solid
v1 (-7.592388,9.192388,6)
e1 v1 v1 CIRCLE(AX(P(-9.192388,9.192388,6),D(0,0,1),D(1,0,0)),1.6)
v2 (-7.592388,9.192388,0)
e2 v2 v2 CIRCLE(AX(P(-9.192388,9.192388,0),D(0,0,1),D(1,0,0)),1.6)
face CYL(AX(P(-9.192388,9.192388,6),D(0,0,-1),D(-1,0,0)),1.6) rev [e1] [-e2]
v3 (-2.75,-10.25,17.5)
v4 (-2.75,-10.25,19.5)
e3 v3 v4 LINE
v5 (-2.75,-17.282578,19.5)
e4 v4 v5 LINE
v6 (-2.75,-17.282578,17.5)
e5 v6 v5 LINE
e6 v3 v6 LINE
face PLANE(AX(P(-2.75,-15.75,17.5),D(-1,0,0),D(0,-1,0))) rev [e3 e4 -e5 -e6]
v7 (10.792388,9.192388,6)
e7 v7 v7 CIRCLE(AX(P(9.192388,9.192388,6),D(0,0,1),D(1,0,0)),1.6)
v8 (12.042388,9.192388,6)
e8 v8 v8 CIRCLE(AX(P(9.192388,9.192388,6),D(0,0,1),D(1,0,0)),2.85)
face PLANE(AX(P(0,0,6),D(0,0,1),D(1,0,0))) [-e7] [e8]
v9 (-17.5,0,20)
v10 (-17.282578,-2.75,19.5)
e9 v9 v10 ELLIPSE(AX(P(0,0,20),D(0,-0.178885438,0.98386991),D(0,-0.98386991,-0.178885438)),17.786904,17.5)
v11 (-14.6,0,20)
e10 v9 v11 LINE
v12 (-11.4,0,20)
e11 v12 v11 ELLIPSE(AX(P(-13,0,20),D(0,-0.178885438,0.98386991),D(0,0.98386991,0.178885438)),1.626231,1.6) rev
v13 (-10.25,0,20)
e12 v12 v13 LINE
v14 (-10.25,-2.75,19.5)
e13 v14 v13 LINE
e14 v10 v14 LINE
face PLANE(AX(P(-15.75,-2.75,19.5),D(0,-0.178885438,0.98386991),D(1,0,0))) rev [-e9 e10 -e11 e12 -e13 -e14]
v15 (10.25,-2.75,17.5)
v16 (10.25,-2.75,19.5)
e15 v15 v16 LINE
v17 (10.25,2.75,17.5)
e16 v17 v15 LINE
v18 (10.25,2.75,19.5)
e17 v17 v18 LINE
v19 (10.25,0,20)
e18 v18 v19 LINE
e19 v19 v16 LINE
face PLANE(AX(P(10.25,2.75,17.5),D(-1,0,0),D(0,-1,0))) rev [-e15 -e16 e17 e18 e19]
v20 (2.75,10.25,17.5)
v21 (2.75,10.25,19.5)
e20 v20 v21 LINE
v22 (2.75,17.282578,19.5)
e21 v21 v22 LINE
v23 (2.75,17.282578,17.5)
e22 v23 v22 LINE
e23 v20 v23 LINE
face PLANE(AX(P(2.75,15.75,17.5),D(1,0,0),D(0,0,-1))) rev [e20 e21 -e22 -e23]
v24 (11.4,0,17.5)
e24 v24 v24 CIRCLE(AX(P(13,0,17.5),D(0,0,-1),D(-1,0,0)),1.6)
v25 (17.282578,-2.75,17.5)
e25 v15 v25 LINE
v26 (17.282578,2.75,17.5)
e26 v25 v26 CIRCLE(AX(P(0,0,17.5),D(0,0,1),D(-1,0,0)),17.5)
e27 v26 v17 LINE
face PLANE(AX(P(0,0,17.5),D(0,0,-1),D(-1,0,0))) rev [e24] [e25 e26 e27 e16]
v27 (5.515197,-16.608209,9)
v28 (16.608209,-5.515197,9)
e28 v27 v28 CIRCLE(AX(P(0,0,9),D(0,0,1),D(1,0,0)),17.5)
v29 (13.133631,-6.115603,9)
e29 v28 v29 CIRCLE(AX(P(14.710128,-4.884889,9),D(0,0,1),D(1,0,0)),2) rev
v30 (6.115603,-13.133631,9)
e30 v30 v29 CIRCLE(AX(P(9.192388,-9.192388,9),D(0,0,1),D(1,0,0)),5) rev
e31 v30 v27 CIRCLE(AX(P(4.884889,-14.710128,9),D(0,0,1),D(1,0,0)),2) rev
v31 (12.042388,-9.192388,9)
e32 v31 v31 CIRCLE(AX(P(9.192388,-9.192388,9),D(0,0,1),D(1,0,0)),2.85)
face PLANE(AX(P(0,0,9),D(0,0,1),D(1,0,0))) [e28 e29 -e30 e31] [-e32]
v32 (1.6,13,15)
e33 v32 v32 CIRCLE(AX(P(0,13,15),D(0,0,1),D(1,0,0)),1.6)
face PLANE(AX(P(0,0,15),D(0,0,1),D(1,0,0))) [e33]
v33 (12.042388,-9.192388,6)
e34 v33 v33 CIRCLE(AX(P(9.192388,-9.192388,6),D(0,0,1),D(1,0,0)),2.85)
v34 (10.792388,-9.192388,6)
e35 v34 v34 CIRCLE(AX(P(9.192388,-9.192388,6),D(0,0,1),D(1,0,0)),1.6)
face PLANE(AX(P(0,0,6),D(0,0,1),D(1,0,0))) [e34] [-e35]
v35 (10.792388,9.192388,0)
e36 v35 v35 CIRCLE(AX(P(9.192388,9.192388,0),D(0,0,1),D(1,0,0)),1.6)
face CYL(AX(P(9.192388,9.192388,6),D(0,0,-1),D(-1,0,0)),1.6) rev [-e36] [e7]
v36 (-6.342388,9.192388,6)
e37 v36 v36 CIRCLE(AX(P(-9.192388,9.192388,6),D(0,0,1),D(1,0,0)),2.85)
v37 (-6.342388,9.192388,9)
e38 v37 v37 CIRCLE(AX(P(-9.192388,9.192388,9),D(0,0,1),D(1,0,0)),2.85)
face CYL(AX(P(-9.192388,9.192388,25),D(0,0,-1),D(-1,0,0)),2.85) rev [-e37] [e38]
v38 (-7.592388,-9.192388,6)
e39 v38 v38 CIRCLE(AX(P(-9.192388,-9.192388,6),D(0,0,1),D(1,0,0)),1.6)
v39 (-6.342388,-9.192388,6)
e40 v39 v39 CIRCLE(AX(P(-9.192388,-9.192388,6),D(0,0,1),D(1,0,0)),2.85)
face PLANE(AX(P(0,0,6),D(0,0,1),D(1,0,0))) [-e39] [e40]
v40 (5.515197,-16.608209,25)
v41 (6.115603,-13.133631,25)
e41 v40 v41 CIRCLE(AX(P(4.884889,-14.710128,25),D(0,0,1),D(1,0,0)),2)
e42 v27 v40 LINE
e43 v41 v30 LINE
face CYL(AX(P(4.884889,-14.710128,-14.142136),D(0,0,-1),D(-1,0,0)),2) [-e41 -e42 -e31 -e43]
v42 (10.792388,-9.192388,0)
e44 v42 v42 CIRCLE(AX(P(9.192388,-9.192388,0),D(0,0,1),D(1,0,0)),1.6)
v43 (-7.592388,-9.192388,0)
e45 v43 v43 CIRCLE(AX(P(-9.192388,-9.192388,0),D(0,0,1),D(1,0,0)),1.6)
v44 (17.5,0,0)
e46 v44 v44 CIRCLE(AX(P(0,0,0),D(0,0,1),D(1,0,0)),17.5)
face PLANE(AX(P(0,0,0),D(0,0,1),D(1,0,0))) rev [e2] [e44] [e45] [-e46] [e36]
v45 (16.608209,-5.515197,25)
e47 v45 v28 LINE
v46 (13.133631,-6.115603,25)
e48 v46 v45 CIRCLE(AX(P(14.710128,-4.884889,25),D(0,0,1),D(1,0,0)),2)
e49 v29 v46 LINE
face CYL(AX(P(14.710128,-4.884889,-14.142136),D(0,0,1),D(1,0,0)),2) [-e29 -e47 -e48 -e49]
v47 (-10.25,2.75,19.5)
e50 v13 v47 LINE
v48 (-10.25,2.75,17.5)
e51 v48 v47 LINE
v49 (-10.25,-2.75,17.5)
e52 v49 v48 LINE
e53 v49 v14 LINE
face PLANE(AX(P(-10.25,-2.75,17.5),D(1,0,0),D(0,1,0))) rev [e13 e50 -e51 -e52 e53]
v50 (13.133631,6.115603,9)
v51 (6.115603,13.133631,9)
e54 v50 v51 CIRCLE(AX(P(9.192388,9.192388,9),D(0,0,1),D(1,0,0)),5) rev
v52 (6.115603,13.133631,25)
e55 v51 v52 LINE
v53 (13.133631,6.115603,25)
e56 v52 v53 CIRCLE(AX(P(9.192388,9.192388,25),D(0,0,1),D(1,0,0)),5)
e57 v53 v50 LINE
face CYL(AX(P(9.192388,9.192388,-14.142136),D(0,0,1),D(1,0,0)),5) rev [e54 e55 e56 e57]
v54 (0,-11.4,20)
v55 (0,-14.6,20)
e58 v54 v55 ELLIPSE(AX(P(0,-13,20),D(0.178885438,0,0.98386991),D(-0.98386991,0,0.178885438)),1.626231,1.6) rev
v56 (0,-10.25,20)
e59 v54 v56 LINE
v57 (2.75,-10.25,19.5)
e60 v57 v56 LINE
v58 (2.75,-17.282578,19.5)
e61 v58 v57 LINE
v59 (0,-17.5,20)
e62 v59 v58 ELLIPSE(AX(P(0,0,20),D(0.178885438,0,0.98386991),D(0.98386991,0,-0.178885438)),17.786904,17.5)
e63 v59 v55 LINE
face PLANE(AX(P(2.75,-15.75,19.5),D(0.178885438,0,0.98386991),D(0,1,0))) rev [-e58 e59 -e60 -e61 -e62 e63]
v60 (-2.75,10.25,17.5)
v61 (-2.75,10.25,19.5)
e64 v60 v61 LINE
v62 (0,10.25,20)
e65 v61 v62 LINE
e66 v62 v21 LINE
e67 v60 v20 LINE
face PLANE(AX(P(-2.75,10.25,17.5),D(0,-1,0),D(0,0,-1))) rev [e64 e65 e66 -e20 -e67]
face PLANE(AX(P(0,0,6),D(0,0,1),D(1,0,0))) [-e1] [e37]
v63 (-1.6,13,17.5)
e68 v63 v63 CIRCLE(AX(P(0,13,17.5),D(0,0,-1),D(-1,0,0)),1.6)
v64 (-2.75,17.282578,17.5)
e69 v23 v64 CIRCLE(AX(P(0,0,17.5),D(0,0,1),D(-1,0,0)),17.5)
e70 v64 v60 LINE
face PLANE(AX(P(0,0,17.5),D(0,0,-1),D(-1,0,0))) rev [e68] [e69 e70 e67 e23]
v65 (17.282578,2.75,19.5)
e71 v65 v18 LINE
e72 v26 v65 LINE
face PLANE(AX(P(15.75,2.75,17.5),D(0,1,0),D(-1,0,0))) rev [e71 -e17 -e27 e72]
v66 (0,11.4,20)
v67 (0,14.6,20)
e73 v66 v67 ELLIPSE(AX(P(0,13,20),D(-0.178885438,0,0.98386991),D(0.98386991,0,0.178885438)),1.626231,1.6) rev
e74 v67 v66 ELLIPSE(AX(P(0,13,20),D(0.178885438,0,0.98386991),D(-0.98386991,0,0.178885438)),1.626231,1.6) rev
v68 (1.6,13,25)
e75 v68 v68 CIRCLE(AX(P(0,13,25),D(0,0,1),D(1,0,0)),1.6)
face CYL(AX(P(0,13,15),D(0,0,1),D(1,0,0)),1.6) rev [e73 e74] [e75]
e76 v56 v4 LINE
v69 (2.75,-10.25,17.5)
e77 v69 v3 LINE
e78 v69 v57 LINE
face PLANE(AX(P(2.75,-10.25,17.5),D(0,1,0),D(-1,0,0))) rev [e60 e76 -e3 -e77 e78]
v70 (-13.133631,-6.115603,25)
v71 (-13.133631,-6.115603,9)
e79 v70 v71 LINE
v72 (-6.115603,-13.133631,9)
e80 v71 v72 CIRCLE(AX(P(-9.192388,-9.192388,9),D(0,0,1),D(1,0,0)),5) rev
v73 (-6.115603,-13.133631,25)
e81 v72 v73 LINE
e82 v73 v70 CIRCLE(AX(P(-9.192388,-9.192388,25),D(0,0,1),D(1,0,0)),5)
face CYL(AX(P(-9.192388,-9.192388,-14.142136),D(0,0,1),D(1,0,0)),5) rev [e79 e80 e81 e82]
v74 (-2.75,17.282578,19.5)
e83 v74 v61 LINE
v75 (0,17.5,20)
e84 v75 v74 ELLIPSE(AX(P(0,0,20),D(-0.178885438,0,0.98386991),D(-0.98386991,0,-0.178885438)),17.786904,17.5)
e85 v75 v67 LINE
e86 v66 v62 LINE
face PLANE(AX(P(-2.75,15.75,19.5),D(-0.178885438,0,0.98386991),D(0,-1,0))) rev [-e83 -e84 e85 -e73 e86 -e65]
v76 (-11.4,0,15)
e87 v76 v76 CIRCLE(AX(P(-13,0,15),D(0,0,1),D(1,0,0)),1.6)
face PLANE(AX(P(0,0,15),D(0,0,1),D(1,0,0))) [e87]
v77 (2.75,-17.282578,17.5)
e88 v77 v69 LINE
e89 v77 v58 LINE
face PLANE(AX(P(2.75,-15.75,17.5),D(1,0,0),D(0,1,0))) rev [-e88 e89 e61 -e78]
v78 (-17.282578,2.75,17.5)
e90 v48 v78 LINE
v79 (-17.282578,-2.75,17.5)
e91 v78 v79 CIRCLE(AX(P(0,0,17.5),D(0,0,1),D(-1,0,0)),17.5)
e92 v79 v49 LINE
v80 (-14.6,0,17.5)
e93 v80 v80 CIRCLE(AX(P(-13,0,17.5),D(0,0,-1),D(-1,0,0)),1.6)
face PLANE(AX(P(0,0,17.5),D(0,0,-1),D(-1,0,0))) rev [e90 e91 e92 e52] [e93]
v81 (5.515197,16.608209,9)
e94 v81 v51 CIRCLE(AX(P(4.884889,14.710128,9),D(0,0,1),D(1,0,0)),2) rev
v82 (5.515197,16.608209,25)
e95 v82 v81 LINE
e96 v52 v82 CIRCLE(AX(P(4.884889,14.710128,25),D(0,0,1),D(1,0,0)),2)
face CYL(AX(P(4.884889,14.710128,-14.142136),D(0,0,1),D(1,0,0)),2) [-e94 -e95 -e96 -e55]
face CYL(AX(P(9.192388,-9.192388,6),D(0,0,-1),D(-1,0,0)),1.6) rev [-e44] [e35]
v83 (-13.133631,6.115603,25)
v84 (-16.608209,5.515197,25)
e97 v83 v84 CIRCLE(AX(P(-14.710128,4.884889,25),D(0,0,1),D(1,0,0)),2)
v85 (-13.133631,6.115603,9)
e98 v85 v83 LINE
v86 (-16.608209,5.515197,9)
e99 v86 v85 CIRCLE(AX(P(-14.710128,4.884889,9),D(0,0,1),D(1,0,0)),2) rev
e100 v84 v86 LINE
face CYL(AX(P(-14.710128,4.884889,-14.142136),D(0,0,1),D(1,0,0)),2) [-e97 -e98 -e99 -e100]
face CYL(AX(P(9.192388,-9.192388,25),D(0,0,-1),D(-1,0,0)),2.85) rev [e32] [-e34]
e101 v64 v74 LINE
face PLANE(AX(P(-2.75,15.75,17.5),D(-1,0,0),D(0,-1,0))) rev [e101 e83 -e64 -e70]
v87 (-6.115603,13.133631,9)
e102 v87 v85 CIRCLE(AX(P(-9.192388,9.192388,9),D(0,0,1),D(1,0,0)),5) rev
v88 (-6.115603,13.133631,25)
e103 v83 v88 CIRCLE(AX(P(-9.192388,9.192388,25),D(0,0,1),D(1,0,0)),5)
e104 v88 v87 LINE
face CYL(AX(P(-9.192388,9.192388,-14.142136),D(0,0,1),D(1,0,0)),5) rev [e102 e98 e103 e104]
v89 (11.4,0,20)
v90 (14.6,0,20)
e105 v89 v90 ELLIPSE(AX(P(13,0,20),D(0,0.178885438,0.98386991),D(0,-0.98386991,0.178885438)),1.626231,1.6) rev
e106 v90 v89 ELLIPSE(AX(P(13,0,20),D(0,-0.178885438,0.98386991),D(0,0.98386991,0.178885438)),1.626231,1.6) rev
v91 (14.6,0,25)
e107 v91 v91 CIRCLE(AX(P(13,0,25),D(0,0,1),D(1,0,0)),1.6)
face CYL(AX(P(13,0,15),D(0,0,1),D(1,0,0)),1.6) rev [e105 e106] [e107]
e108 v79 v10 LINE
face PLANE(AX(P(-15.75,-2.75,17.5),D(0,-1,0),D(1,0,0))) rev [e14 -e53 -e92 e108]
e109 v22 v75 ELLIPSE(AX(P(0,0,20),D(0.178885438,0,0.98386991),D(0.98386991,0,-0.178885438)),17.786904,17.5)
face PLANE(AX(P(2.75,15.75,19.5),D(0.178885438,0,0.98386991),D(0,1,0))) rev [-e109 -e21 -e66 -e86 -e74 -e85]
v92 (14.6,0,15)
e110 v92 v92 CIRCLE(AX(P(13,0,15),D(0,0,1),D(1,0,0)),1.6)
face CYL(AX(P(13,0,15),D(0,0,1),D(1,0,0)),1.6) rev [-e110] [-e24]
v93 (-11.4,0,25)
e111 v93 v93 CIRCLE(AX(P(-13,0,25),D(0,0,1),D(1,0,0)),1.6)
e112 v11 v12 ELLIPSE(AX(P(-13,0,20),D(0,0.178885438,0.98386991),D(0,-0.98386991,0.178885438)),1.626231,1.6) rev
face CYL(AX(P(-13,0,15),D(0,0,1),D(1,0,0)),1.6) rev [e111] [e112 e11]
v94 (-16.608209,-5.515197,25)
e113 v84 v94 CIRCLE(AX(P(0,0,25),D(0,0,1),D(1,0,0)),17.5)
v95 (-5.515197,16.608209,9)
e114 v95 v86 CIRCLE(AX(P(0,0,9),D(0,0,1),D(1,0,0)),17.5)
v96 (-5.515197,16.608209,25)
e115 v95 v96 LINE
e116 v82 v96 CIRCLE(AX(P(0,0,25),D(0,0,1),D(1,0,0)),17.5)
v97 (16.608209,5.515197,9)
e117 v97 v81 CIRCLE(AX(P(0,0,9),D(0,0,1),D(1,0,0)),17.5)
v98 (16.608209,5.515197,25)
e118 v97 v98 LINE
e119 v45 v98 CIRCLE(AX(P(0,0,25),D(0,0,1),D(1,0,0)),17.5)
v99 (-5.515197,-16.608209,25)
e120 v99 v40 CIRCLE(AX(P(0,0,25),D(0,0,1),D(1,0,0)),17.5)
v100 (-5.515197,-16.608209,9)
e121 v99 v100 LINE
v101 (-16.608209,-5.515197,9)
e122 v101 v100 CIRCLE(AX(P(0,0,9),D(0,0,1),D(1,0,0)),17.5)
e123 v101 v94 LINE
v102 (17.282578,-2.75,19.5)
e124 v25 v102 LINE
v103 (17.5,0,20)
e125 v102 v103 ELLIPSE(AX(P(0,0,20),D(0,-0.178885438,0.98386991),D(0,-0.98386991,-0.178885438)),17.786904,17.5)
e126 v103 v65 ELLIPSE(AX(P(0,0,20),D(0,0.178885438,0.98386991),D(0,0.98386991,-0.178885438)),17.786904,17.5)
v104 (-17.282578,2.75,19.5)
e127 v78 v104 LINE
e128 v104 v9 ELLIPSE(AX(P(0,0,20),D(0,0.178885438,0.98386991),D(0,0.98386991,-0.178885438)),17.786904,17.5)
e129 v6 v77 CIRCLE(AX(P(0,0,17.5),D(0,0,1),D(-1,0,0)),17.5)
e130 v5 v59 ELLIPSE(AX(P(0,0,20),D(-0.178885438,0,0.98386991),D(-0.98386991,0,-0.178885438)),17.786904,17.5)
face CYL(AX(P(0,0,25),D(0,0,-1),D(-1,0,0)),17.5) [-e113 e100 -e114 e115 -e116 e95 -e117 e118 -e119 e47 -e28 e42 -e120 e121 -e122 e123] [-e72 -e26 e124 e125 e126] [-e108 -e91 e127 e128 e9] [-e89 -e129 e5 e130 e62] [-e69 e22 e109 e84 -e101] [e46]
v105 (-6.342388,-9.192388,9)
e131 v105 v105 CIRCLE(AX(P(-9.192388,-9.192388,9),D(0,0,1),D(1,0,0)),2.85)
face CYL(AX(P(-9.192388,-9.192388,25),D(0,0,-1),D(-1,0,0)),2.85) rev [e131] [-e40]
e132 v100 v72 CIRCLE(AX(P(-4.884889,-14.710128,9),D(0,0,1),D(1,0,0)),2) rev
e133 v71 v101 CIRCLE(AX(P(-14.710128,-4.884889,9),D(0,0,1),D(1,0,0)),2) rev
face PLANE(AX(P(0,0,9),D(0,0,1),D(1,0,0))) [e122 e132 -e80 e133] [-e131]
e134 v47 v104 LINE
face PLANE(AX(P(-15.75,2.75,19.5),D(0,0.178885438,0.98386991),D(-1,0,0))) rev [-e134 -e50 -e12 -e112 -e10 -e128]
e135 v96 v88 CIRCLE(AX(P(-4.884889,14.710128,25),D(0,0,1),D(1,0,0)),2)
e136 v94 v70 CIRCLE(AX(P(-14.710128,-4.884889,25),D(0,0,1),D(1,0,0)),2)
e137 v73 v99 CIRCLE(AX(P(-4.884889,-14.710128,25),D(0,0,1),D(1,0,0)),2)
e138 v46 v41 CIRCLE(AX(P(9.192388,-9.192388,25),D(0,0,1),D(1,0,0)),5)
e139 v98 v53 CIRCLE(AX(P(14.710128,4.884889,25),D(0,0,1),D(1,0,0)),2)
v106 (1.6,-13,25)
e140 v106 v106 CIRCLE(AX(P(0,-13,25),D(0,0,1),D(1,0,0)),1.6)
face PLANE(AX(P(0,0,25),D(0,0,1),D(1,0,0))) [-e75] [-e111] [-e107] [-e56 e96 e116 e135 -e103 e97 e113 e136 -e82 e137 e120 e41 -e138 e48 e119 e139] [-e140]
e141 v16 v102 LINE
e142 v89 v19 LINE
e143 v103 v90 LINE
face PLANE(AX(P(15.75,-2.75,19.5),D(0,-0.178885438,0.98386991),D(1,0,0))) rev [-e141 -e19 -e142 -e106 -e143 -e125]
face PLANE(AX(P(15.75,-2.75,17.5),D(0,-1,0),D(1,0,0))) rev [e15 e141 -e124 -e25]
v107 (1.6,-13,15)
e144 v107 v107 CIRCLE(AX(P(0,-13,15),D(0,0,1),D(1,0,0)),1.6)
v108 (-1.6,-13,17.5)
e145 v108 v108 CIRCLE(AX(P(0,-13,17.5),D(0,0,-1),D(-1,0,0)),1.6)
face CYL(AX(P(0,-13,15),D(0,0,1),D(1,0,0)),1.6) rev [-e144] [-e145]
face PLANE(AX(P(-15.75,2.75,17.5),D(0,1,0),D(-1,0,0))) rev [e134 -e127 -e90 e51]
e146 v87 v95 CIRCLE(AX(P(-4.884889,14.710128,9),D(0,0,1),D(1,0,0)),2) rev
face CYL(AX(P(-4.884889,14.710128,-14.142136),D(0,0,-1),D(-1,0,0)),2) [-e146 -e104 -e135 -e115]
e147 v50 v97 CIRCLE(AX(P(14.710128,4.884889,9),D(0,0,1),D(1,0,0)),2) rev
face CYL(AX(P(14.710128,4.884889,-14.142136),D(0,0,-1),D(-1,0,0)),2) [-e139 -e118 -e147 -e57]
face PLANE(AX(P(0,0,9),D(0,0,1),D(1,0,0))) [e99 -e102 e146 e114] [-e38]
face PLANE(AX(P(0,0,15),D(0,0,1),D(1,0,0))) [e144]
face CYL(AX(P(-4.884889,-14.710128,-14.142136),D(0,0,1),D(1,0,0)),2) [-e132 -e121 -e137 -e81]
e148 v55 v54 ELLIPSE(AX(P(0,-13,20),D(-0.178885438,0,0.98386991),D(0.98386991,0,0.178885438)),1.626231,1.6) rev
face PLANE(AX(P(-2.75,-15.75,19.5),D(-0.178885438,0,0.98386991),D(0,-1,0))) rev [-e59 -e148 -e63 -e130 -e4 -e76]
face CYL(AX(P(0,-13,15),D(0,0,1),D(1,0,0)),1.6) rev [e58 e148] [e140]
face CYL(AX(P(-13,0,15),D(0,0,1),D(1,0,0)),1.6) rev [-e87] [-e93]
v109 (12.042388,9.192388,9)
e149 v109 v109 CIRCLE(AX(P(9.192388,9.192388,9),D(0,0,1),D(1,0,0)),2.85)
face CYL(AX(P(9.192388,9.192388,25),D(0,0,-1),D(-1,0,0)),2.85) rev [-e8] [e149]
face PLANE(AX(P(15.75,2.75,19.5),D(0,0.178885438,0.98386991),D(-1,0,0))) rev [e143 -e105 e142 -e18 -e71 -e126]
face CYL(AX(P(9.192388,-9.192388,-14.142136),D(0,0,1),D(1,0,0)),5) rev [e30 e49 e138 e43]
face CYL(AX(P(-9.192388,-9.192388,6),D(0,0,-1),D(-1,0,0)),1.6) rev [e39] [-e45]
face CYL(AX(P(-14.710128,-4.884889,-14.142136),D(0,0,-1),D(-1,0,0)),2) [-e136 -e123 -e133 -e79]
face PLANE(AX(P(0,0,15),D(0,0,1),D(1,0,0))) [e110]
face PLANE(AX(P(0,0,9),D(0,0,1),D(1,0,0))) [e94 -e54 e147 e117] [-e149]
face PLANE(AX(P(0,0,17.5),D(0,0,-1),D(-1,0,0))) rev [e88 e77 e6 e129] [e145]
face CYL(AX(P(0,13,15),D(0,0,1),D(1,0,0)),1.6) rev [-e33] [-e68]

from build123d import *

# Parameters (mm, degrees)
SKETCH1_R           = 17.5
SKETCH1_R_2         = 2.85
BOSS_EXTRUDE1_DEPTH = 25
SKETCH1_3_R         = 2.85
SKETCH1_3_R_2       = 1.6
BOSS_EXTRUDE2_DEPTH = 6
SKETCH2_R           = 5
CUT_EXTRUDE1_DEPTH  = 16
FILLET1_R           = 2
CUT_EXTRUDE2_START  = -7.5
SKETCH3_R           = 1.6
CUT_EXTRUDE2_DEPTH  = 2.5
CUT_EXTRUDE3_START  = -10
SKETCH3_2_R         = 1.6
CUT_EXTRUDE3_DEPTH  = 10
CHAMFER1_SIZE       = 2.75
CHAMFER1_SIZE_2     = 0.5


with BuildPart() as part:
    # Sketch1 → Boss-Extrude1 (new body)
    with BuildSketch(Plane(origin=(0, 0, 0), x_dir=(0, 1, 0), z_dir=(0, 0, 1))):
        with Locations(Location((0, 0, 0), (0, 0, 270))):
            Circle(SKETCH1_R)
        with Locations(Location((-9.192388155, 9.192388155, 0), (0, 0, 270))):
            Circle(SKETCH1_R_2, mode=Mode.SUBTRACT)
        with Locations(Location((-9.192388155, -9.192388155, 0), (0, 0, 270))):
            Circle(SKETCH1_R_2, mode=Mode.SUBTRACT)
        with Locations(Location((9.192388155, -9.192388155, 0), (0, 0, 270))):
            Circle(SKETCH1_R_2, mode=Mode.SUBTRACT)
        with Locations(Location((9.192388155, 9.192388155, 0), (0, 0, 270))):
            Circle(SKETCH1_R_2, mode=Mode.SUBTRACT)
    extrude(amount=BOSS_EXTRUDE1_DEPTH)

    # Sketch1<3> → Boss-Extrude2 (add)
    # profile 1 of 4: a face of its own
    with BuildSketch(Plane(origin=(0, 0, 0), x_dir=(0, 1, 0), z_dir=(0, 0, 1))):
        with Locations(Location((-9.192388155, -9.192388155, 0), (0, 0, 270))):
            Circle(SKETCH1_3_R)
        with Locations(Location((-9.192388155, -9.192388155, 0), (0, 0, 270))):
            Circle(SKETCH1_3_R_2, mode=Mode.SUBTRACT)
    # profile 2 of 4: a face of its own
    with BuildSketch(Plane(origin=(0, 0, 0), x_dir=(0, 1, 0), z_dir=(0, 0, 1))):
        with Locations(Location((-9.192388155, 9.192388155, 0), (0, 0, 270))):
            Circle(SKETCH1_3_R)
        with Locations(Location((-9.192388155, 9.192388155, 0), (0, 0, 270))):
            Circle(SKETCH1_3_R_2, mode=Mode.SUBTRACT)
    # profile 3 of 4: a face of its own
    with BuildSketch(Plane(origin=(0, 0, 0), x_dir=(0, 1, 0), z_dir=(0, 0, 1))):
        with Locations(Location((9.192388155, -9.192388155, 0), (0, 0, 270))):
            Circle(SKETCH1_3_R)
        with Locations(Location((9.192388155, -9.192388155, 0), (0, 0, 270))):
            Circle(SKETCH1_3_R_2, mode=Mode.SUBTRACT)
    # profile 4 of 4: a face of its own
    with BuildSketch(Plane(origin=(0, 0, 0), x_dir=(0, 1, 0), z_dir=(0, 0, 1))):
        with Locations(Location((9.192388155, 9.192388155, 0), (0, 0, 270))):
            Circle(SKETCH1_3_R)
        with Locations(Location((9.192388155, 9.192388155, 0), (0, 0, 270))):
            Circle(SKETCH1_3_R_2, mode=Mode.SUBTRACT)
    extrude(amount=BOSS_EXTRUDE2_DEPTH)

    # Sketch2 → Cut-Extrude1 (cut)
    with BuildSketch(Plane.XY.offset(25)):
        with Locations((-9.192388155, 9.192388155)):
            Circle(SKETCH2_R)
        with Locations((9.192388155, 9.192388155)):
            Circle(SKETCH2_R)
        with Locations((9.192388155, -9.192388155)):
            Circle(SKETCH2_R)
        with Locations((-9.192388155, -9.192388155)):
            Circle(SKETCH2_R)
    extrude(amount=-CUT_EXTRUDE1_DEPTH, mode=Mode.SUBTRACT)

    # Fillet1
    fillet1_edges = [part.edges().sort_by_distance(p)[0] for p in [
        (-14.028560913, -10.46181049, 17),
        (-10.46181049, -14.028560913, 17),
        (10.46181049, -14.028560913, 17),
        (14.028560913, -10.46181049, 17),
        (14.028560913, 10.46181049, 17),
        (10.46181049, 14.028560913, 17),
        (-10.46181049, 14.028560913, 17),
        (-14.028560913, 10.46181049, 17),
    ]]
    fillet(fillet1_edges, radius=FILLET1_R)

    # Sketch3 → Cut-Extrude2 (cut)
    # profile 1 of 4: a face of its own
    with BuildSketch(Plane.XY.offset(25).offset(CUT_EXTRUDE2_START)):
        with BuildLine():
            Line((-2.75, 15.75), (-2.75, 17.282577933))
            ThreePointArc((-2.75, 17.282577933), (0, 17.5), (2.75, 17.282577933))
            Line((2.75, 17.282577933), (2.75, 15.75))
            Line((2.75, 15.75), (2.75, 10.25))
            Line((2.75, 10.25), (-2.75, 10.25))
            Line((-2.75, 10.25), (-2.75, 15.75))
        make_face()
        with Locations((0, 13)):
            Circle(SKETCH3_R, mode=Mode.SUBTRACT)
    # profile 2 of 4: a face of its own
    with BuildSketch(Plane.XY.offset(25).offset(CUT_EXTRUDE2_START)):
        with BuildLine():
            Line((15.75, -2.75), (10.25, -2.75))
            Line((10.25, -2.75), (10.25, 2.75))
            Line((10.25, 2.75), (15.75, 2.75))
            Line((15.75, 2.75), (17.282577933, 2.75))
            ThreePointArc((17.282577933, 2.75), (17.5, 0), (17.282577933, -2.75))
            Line((17.282577933, -2.75), (15.75, -2.75))
        make_face()
        with Locations((13, 0)):
            Circle(SKETCH3_R, mode=Mode.SUBTRACT)
    # profile 3 of 4: a face of its own
    with BuildSketch(Plane.XY.offset(25).offset(CUT_EXTRUDE2_START)):
        with BuildLine():
            Line((-2.75, -15.75), (-2.75, -10.25))
            Line((-2.75, -10.25), (2.75, -10.25))
            Line((2.75, -10.25), (2.75, -15.75))
            Line((2.75, -15.75), (2.75, -17.282577933))
            ThreePointArc((2.75, -17.282577933), (0, -17.5), (-2.75, -17.282577933))
            Line((-2.75, -17.282577933), (-2.75, -15.75))
        make_face()
        with Locations((0, -13)):
            Circle(SKETCH3_R, mode=Mode.SUBTRACT)
    # profile 4 of 4: a face of its own
    with BuildSketch(Plane.XY.offset(25).offset(CUT_EXTRUDE2_START)):
        with BuildLine():
            Line((-15.75, 2.75), (-10.25, 2.75))
            Line((-10.25, 2.75), (-10.25, -2.75))
            Line((-10.25, -2.75), (-15.75, -2.75))
            Line((-15.75, -2.75), (-17.282577933, -2.75))
            ThreePointArc((-17.282577933, -2.75), (-17.5, 0), (-17.282577933, 2.75))
            Line((-17.282577933, 2.75), (-15.75, 2.75))
        make_face()
        with Locations((-13, 0)):
            Circle(SKETCH3_R, mode=Mode.SUBTRACT)
    extrude(amount=CUT_EXTRUDE2_DEPTH, mode=Mode.SUBTRACT)

    # Sketch3<2> → Cut-Extrude3 (cut)
    with BuildSketch(Plane.XY.offset(25).offset(CUT_EXTRUDE3_START)):
        with Locations((-13, 0)):
            Circle(SKETCH3_2_R)
        with Locations((0, 13)):
            Circle(SKETCH3_2_R)
        with Locations((13, 0)):
            Circle(SKETCH3_2_R)
        with Locations((0, -13)):
            Circle(SKETCH3_2_R)
    extrude(amount=CUT_EXTRUDE3_DEPTH, mode=Mode.SUBTRACT)

    # Chamfer1
    # the kernel refuses this chamfer: 2.75, 0.5 mm, written as the material it adds along each edge
    with BuildSketch(Plane(origin=(-3.104266441, -2.75, 20), x_dir=(1.0355932807417332e-14, 0.9999763028084744, 0.006884317068104265), z_dir=(-1, 0, 0))) as chamfer1_piece_1_section:
        Polygon((CHAMFER1_SIZE * 0.999976302808, CHAMFER1_SIZE * 0.0068843170681), (-CHAMFER1_SIZE_2 * 0.0068843170681, CHAMFER1_SIZE_2 * 0.999976302808), (0, 0), align=None)
    chamfer1_piece_1 = extrude(amount=21.324045051, mode=Mode.PRIVATE)
    chamfer1_piece_1 = chamfer1_piece_1 & Plane(origin=(0, 0, 19.863927103), x_dir=(1, 0, 0), z_dir=(0, 0, -1)) * Cylinder(17.5, 54, mode=Mode.PRIVATE)
    chamfer1_piece_1 = chamfer1_piece_1 - Plane(origin=(-13, 0, 19.863927103), x_dir=(1, 0, 0), z_dir=(0, 0, -1)) * Cylinder(1.6, 54, mode=Mode.PRIVATE)
    add(chamfer1_piece_1)
    with BuildSketch(Plane(origin=(-24.428311492, 2.75, 20), x_dir=(2.1371797081769355e-15, 0.20388124945923355, -0.9789956262001082), z_dir=(1, 0, 0))) as chamfer1_piece_2_section:
        Polygon((CHAMFER1_SIZE_2 * 0.9789956262, -CHAMFER1_SIZE_2 * 0.203881249459), (-CHAMFER1_SIZE * 0.203881249459, -CHAMFER1_SIZE * 0.9789956262), (0, 0), align=None)
    chamfer1_piece_2 = extrude(amount=21.324045051, mode=Mode.PRIVATE)
    chamfer1_piece_2 = chamfer1_piece_2 & Plane(origin=(0, 0, 19.852070676), x_dir=(1, 0, 0), z_dir=(0, 0, -1)) * Cylinder(17.5, 54, mode=Mode.PRIVATE)
    chamfer1_piece_2 = chamfer1_piece_2 - Plane(origin=(-13, 0, 19.852070676), x_dir=(1, 0, 0), z_dir=(0, 0, -1)) * Cylinder(1.6, 54, mode=Mode.PRIVATE)
    add(chamfer1_piece_2)
    with BuildSketch(Plane(origin=(-2.75, 3.104266441, 20), x_dir=(0.9999763028084744, 0, 0.006884317068104265), z_dir=(0, 1, 0))) as chamfer1_piece_3_section:
        Polygon((CHAMFER1_SIZE * 0.999976302808, CHAMFER1_SIZE * 0.0068843170681), (-CHAMFER1_SIZE_2 * 0.0068843170681, CHAMFER1_SIZE_2 * 0.999976302808), (0, 0), align=None)
    chamfer1_piece_3 = extrude(amount=21.324045051, mode=Mode.PRIVATE)
    chamfer1_piece_3 = chamfer1_piece_3 & Plane(origin=(0, 0, 19.863927103), x_dir=(1, 0, 0), z_dir=(0, 0, -1)) * Cylinder(17.5, 54, mode=Mode.PRIVATE)
    chamfer1_piece_3 = chamfer1_piece_3 - Plane(origin=(0, 13, 19.863927103), x_dir=(1, 0, 0), z_dir=(0, 0, -1)) * Cylinder(1.6, 54, mode=Mode.PRIVATE)
    add(chamfer1_piece_3)
    with BuildSketch(Plane(origin=(2.75, 24.428311492, 20), x_dir=(0.20388124945923355, 0, -0.9789956262001082), z_dir=(0, -1, 0))) as chamfer1_piece_4_section:
        Polygon((CHAMFER1_SIZE_2 * 0.9789956262, -CHAMFER1_SIZE_2 * 0.203881249459), (-CHAMFER1_SIZE * 0.203881249459, -CHAMFER1_SIZE * 0.9789956262), (0, 0), align=None)
    chamfer1_piece_4 = extrude(amount=21.324045051, mode=Mode.PRIVATE)
    chamfer1_piece_4 = chamfer1_piece_4 & Plane(origin=(0, 0, 19.852070749), x_dir=(1, 0, 0), z_dir=(0, 0, -1)) * Cylinder(17.5, 54, mode=Mode.PRIVATE)
    chamfer1_piece_4 = chamfer1_piece_4 - Plane(origin=(0, 13, 19.852070749), x_dir=(1, 0, 0), z_dir=(0, 0, -1)) * Cylinder(1.6, 54, mode=Mode.PRIVATE)
    add(chamfer1_piece_4)
    with BuildSketch(Plane(origin=(3.104266441, 2.75, 20), x_dir=(-3.409880314637416e-15, -0.9999763028084744, 0.006884317068104265), z_dir=(1, 0, 0))) as chamfer1_piece_5_section:
        Polygon((CHAMFER1_SIZE * 0.999976302808, CHAMFER1_SIZE * 0.0068843170681), (-CHAMFER1_SIZE_2 * 0.0068843170681, CHAMFER1_SIZE_2 * 0.999976302808), (0, 0), align=None)
    chamfer1_piece_5 = extrude(amount=21.324045051, mode=Mode.PRIVATE)
    chamfer1_piece_5 = chamfer1_piece_5 & Plane(origin=(0, 0, 19.863927103), x_dir=(1, 0, 0), z_dir=(0, 0, -1)) * Cylinder(17.5, 54, mode=Mode.PRIVATE)
    chamfer1_piece_5 = chamfer1_piece_5 - Plane(origin=(13, 0, 19.863927103), x_dir=(1, 0, 0), z_dir=(0, 0, -1)) * Cylinder(1.6, 54, mode=Mode.PRIVATE)
    add(chamfer1_piece_5)
    with BuildSketch(Plane(origin=(24.428311492, -2.75, 20), x_dir=(3.409880314637416e-15, 0.9999763028084744, 0.006884317068104265), z_dir=(-1, 0, 0))) as chamfer1_piece_6_section:
        Polygon((CHAMFER1_SIZE * 0.999976302808, CHAMFER1_SIZE * 0.0068843170681), (-CHAMFER1_SIZE_2 * 0.0068843170681, CHAMFER1_SIZE_2 * 0.999976302808), (0, 0), align=None)
    chamfer1_piece_6 = extrude(amount=21.324045051, mode=Mode.PRIVATE)
    chamfer1_piece_6 = chamfer1_piece_6 & Plane(origin=(0, 0, 19.852070366), x_dir=(1, 0, 0), z_dir=(0, 0, -1)) * Cylinder(17.5, 54, mode=Mode.PRIVATE)
    chamfer1_piece_6 = chamfer1_piece_6 - Plane(origin=(13, 0, 19.852070366), x_dir=(1, 0, 0), z_dir=(0, 0, -1)) * Cylinder(1.6, 54, mode=Mode.PRIVATE)
    add(chamfer1_piece_6)
    with BuildSketch(Plane(origin=(2.75, -3.104266441, 20), x_dir=(-0.9999763028084744, 6.88290656102737e-15, 0.006884317068104265), z_dir=(0, -1, 0))) as chamfer1_piece_7_section:
        Polygon((CHAMFER1_SIZE * 0.999976302808, CHAMFER1_SIZE * 0.0068843170681), (-CHAMFER1_SIZE_2 * 0.0068843170681, CHAMFER1_SIZE_2 * 0.999976302808), (0, 0), align=None)
    chamfer1_piece_7 = extrude(amount=21.324045051, mode=Mode.PRIVATE)
    chamfer1_piece_7 = chamfer1_piece_7 & Plane(origin=(0, 0, 19.863927103), x_dir=(1, 0, 0), z_dir=(0, 0, -1)) * Cylinder(17.5, 54, mode=Mode.PRIVATE)
    chamfer1_piece_7 = chamfer1_piece_7 - Plane(origin=(0, -13, 19.863927103), x_dir=(1, 0, 0), z_dir=(0, 0, -1)) * Cylinder(1.6, 54, mode=Mode.PRIVATE)
    add(chamfer1_piece_7)
    with BuildSketch(Plane(origin=(-2.75, -24.428311492, 20), x_dir=(-0.20388124945923355, 1.4290779976363847e-15, -0.9789956262001082), z_dir=(0, 1, 0))) as chamfer1_piece_8_section:
        Polygon((CHAMFER1_SIZE_2 * 0.9789956262, -CHAMFER1_SIZE_2 * 0.203881249459), (-CHAMFER1_SIZE * 0.203881249459, -CHAMFER1_SIZE * 0.9789956262), (0, 0), align=None)
    chamfer1_piece_8 = extrude(amount=21.324045051, mode=Mode.PRIVATE)
    chamfer1_piece_8 = chamfer1_piece_8 & Plane(origin=(0, 0, 19.852070422), x_dir=(1, 0, 0), z_dir=(0, 0, -1)) * Cylinder(17.5, 54, mode=Mode.PRIVATE)
    chamfer1_piece_8 = chamfer1_piece_8 - Plane(origin=(0, -13, 19.852070422), x_dir=(1, 0, 0), z_dir=(0, 0, -1)) * Cylinder(1.6, 54, mode=Mode.PRIVATE)
    add(chamfer1_piece_8)


solid = part.part
